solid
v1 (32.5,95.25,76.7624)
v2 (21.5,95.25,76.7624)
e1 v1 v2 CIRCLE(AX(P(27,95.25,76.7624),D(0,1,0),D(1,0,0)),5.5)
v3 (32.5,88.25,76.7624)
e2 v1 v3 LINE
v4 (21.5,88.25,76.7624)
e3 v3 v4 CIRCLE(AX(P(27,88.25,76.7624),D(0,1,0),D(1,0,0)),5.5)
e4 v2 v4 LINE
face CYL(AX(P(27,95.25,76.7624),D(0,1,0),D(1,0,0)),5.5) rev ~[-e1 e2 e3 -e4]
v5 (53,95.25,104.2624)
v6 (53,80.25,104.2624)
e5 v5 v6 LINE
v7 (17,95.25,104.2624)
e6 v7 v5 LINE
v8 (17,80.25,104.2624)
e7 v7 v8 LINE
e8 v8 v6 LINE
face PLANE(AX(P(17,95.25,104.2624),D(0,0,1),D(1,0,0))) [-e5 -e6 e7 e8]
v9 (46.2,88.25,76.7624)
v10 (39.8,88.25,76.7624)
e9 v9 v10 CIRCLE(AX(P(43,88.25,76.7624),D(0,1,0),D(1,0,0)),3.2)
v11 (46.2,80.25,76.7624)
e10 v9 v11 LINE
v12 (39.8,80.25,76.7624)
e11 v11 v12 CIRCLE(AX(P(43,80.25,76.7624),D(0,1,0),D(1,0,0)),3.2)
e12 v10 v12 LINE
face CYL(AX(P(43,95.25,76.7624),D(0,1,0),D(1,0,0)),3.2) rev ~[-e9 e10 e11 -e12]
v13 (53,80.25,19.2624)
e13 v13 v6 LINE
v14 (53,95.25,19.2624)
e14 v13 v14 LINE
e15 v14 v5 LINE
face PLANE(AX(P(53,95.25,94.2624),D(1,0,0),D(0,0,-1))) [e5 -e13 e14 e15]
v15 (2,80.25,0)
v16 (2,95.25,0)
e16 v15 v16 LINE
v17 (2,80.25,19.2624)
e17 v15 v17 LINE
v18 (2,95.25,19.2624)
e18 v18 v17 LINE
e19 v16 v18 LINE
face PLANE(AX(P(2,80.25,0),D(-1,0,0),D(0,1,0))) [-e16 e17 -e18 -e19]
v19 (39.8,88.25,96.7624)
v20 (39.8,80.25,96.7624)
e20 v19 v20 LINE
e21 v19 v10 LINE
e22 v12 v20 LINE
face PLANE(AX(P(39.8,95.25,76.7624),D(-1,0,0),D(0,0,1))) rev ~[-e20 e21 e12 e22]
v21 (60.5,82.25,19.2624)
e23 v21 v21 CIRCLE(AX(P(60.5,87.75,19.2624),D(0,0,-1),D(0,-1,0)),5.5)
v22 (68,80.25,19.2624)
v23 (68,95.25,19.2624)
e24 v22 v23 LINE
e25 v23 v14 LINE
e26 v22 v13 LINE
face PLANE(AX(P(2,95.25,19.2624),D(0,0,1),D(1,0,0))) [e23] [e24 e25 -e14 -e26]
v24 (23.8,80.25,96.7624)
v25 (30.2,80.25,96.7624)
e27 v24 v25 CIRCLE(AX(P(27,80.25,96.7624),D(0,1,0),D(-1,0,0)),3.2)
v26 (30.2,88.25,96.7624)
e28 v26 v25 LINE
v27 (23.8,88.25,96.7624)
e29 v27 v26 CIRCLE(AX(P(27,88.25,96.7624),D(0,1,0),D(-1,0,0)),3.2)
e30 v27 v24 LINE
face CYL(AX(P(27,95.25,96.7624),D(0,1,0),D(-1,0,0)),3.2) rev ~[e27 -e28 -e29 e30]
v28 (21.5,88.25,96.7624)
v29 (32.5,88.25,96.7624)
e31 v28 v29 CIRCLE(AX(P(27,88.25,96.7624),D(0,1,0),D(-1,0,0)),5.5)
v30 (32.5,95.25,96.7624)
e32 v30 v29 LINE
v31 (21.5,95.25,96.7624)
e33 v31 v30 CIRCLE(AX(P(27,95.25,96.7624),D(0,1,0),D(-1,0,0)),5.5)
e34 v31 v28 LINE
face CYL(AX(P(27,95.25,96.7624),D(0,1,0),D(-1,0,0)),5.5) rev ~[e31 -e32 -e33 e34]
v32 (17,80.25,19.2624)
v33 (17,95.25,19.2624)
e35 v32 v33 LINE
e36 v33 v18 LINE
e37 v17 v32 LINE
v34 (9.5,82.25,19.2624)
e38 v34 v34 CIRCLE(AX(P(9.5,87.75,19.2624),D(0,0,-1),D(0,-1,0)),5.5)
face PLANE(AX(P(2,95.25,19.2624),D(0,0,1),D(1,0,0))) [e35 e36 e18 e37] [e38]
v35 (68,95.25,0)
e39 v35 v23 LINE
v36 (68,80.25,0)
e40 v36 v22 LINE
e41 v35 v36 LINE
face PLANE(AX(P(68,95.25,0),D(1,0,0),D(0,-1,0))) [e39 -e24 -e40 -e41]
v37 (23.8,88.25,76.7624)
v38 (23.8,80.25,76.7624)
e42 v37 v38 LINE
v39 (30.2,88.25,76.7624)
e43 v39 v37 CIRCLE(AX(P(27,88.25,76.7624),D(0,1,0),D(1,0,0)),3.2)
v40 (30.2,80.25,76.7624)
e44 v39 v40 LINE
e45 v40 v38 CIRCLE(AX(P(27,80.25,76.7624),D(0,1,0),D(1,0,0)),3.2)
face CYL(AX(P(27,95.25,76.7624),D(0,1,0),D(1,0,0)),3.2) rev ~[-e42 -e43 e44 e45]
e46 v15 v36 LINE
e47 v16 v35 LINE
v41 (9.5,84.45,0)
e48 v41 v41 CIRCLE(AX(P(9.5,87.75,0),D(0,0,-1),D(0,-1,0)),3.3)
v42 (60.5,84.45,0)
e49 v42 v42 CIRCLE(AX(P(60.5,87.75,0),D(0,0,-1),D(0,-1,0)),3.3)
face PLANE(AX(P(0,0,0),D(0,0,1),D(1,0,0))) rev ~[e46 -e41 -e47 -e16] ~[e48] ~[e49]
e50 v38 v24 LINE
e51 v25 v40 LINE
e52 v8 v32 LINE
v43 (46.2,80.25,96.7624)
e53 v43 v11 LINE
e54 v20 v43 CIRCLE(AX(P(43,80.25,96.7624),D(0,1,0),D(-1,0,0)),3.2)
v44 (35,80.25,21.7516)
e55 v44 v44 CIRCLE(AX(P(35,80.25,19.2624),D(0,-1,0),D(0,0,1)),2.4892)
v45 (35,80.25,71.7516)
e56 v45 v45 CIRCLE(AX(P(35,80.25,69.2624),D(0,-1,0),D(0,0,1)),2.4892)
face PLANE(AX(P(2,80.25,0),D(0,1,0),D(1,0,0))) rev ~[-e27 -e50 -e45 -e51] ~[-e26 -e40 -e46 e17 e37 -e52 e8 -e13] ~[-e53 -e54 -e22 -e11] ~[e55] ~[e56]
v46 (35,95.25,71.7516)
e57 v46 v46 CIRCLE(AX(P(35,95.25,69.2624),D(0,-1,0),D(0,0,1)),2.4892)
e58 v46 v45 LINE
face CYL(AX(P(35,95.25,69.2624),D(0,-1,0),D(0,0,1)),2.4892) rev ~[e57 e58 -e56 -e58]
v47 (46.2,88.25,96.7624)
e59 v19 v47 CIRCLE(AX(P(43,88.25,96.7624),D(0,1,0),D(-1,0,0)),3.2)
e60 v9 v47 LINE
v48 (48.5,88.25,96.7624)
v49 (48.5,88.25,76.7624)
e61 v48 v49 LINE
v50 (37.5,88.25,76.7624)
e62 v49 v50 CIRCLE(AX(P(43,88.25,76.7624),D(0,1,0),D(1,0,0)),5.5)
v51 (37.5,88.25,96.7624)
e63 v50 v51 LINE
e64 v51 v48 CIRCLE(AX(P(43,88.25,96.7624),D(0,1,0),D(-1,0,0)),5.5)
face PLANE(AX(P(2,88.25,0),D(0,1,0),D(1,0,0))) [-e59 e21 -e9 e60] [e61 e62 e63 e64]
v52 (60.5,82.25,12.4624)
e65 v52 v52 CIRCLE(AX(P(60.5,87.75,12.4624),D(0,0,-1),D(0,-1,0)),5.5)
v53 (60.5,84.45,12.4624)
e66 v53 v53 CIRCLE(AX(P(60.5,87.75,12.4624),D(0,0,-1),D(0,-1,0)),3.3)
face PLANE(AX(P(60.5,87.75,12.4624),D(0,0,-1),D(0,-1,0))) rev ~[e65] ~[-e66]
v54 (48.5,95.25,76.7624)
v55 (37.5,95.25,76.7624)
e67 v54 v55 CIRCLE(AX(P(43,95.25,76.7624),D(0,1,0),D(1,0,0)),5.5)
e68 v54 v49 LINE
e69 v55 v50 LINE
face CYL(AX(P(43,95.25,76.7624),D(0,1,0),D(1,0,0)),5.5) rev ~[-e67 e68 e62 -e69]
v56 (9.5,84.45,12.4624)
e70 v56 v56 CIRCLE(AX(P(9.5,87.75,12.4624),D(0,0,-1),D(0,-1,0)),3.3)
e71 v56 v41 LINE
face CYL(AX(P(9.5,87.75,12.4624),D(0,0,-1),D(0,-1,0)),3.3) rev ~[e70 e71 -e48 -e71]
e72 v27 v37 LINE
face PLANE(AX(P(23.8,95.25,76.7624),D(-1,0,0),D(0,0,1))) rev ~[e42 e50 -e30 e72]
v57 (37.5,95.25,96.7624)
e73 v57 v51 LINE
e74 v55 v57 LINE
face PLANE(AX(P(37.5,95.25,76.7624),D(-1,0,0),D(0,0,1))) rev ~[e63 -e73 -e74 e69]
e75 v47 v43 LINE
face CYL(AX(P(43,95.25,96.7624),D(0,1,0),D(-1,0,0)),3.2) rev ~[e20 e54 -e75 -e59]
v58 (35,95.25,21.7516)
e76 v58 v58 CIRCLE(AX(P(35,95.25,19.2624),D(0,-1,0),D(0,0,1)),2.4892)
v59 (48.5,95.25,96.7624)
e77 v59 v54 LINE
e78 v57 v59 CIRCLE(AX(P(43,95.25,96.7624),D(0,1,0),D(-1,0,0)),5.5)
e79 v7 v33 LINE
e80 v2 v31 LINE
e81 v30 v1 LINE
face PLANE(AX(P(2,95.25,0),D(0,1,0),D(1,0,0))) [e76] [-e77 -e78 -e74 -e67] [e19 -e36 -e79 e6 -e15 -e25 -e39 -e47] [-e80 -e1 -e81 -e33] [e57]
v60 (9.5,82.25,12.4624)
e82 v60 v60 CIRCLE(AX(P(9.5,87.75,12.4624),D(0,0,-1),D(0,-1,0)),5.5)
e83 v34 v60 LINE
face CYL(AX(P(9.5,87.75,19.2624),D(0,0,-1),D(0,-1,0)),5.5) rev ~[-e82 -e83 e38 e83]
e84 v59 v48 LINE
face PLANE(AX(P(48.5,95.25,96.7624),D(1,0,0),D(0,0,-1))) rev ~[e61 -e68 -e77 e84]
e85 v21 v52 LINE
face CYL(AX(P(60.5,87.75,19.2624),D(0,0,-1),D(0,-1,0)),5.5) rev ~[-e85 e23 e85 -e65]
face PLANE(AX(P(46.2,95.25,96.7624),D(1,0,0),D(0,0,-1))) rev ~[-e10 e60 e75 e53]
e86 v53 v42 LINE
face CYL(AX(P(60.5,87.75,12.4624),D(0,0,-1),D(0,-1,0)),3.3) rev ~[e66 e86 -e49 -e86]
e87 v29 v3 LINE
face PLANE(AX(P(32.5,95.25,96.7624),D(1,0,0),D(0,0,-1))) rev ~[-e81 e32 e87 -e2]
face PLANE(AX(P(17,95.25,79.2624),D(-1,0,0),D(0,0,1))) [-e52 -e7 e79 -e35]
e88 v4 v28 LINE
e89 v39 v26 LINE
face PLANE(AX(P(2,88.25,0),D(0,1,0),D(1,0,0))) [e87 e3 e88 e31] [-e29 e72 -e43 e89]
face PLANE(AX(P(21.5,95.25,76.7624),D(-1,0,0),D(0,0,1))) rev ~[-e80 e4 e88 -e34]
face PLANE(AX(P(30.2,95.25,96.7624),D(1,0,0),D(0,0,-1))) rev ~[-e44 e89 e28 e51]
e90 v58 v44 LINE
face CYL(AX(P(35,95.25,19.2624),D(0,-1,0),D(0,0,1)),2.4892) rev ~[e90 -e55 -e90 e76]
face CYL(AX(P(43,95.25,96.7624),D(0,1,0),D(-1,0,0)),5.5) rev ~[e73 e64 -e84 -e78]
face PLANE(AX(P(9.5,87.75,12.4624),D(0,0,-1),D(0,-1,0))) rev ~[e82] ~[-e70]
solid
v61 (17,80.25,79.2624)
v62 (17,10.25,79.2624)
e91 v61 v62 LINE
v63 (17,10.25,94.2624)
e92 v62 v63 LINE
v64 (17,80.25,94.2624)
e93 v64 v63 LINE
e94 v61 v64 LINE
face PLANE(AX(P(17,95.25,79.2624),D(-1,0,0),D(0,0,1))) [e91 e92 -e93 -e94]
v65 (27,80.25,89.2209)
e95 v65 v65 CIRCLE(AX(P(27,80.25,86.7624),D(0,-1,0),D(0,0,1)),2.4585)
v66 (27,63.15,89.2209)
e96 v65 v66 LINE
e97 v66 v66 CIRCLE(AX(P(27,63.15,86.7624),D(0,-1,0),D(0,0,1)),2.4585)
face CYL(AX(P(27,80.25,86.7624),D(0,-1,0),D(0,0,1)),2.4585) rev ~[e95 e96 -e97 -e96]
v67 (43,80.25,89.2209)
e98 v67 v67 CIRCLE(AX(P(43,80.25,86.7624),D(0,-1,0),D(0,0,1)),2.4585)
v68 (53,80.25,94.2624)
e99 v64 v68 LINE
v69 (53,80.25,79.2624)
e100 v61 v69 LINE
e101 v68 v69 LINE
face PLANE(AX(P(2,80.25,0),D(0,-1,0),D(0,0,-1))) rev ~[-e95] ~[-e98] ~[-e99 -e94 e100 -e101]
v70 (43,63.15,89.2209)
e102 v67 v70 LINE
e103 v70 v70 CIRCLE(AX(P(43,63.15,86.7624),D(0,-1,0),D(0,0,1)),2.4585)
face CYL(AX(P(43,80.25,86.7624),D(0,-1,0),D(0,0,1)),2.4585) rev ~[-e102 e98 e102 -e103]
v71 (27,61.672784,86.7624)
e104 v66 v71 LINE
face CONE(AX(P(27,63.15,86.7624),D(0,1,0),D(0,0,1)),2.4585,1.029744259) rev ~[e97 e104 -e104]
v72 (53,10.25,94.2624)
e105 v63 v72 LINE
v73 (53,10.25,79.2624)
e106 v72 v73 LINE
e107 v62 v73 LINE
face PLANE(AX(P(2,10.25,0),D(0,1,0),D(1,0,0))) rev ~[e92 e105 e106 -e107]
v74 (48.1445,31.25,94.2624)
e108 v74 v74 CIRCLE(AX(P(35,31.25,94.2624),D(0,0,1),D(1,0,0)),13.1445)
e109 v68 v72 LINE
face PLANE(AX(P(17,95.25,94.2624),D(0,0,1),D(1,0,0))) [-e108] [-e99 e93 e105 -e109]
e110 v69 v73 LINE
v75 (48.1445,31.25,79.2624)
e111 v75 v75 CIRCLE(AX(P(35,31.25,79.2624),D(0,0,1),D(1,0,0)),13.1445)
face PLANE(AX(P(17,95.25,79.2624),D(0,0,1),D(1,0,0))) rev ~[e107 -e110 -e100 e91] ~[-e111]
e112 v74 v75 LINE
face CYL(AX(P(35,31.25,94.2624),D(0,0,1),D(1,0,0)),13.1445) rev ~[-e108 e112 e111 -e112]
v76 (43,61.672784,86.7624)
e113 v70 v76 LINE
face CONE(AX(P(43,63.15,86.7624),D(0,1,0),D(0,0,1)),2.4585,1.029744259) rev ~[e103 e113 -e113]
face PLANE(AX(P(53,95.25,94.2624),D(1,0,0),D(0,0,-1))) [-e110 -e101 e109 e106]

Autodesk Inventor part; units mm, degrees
ref_plane "YZ Plane" through (0, 0, 0) normal (1, 0, 0) x (0, 1, 0)
ref_plane "XZ Plane" through (0, 0, 0) normal (0, 1, 0) x (-1, 0, 0)
ref_plane "Work Plane1" through (0, 0, 0) normal (0, 0, 1) x (1, 0, 0)
sketch "Sketch1" plane through (0, 0, 0) normal (0, 0, 1) x (1, 0, 0)
  line L0 (2, 95.25) -> (68, 95.25)
  line L1 (2, 80.25) -> (68, 80.25)
  line L2 (2, 0) -> (2, 95.25)
  line L3 (68, 95.25) -> (68, 0)
  point P0 (0, 0)
ref_plane "Work Plane2" through (12.0686, 8.3392, 79.2624) normal (0, 0, 1) x (1, 0, 0)
extrude "Extrusion1" add sketch "Sketch1" along normal up to surface (79.2624 mm away)
sketch "Sketch2" plane through (2, 95.25, 79.2624) normal (0, 0, 1) x (1, 0, 0)
  line L0 (66, -15) -> (66, 0) projected
  line L1 (66, 0) -> (0, 0) projected
  line L2 (66, -15) -> (51, -15)
  line L3 (51, -15) -> (51, 0)
  line L4 (51, 0) -> (66, 0)
  line L5 (66, 0) -> (66, -15)
  line L6 (0, 0) -> (0, -15) projected
  line L7 (0, -15) -> (15, -15)
  line L8 (15, -15) -> (15, 0)
  line L9 (15, 0) -> (0, 0)
  line L10 (0, 0) -> (0, -15)
  point P0 (-2, -95.25)
  dimension "d2" = 15
  dimension "d3" = 15
extrude "Extrusion2" cut sketch "Sketch2" against normal blind 60
sketch "Sketch4" plane through (2, 95.25, 19.2624) normal (0, 0, 1) x (1, 0, 0)
  line L0 (66, -15) -> (51, -15) projected
  line L1 (66, 0) -> (66, -15) projected
  line L2 (51, 0) -> (66, 0) projected
  line L3 (51, -15) -> (51, 0) projected
  line L4 (15, -15) -> (0, -15) projected
  line L5 (0, -15) -> (0, 0) projected
  line L6 (15, 0) -> (15, -15) projected
  line L7 (0, 0) -> (15, 0) projected
  point P0 (-2, -95.25)
  point P1 (58.5, -7.5)
  point P2 (7.5, -7.5)
hole "Hole1" at (60.5, 87.75, 19.2624) at (9.5, 87.75, 19.2624) direction (0, 0, -1) diameter 6.6 end through all counterbore diameter 11 counterbore depth 6.8 clearance for "Socket Head Cap Screw ISO 4762" size "M6" standard "ISO"
sketch "Sketch5" plane through (2, 95.25, 0) normal (0, 1, 0) x (1, 0, 0)
  line L0 (51, -79.2624) -> (51, -19.2624) projected
  line L1 (15, -19.2624) -> (15, -79.2624) projected
  line L2 (15, -79.2624) -> (51, -79.2624) projected
  line L3 (51, -79.2624) -> (15, -79.2624)
  line L4 (15, -79.2624) -> (15, -94.2624)
  line L5 (15, -94.2624) -> (51, -94.2624)
  line L6 (51, -94.2624) -> (51, -79.2624)
  point P0 (-2, 0)
  dimension "d13" = 15
extrude "Extrusion3" add sketch "Sketch5" against normal blind 85
sketch "Sketch6" plane through (17, 95.25, 94.2624) normal (0, 0, 1) x (1, 0, 0)
  circle A0 centre (18, -64) radius 25
  circle A1 centre (18, -64) radius 13.1445
  point P0 (-17, -95.25)
  dimension "d16" = 26.289
extrude "Extrusion4" cut sketch "Sketch6" against normal up to surface (15 mm away) contours A1
sketch "Sketch7" plane through (2, 95.25, 0) normal (0, 1, 0) x (1, 0, 0)
  line L0 (66, 0) -> (0, 0) projected
  line L1 (51, -94.2624) -> (51, -19.2624) projected
  line L2 (15, -19.2624) -> (15, -94.2624) projected
  line L3 (15, -94.2624) -> (51, -94.2624) projected
  line L4 (51, -94.2624) -> (51, -19.2624) projected
  line L5 (51, -19.2624) -> (66, -19.2624) projected
  line L6 (66, 0) -> (66, -19.2624) projected
  line L7 (66, 0) -> (0, 0) projected
  line L8 (0, 0) -> (0, -19.2624) projected
  line L9 (0, -19.2624) -> (15, -19.2624) projected
  point P0 (-2, 0)
  point P1 (33, -19.2624)
  point P2 (33, -69.2624)
  dimension "d19" = 50
hole "Hole2" at (35, 95.25, 19.2624) at (35, 95.25, 69.2624) direction (0, -1, 0) diameter 4.9784 depth 19.05 tip angle 118 thread size "1/4-20 UNC" class "2B" standard "ANSI Unified Screw Threads"
ref_plane "Work Plane3" through (2, 80.25, 0) normal (0, -1, 0) x (1, 0, 0)
split body "Split1" result two bodies by plane through (2, 80.25, 0) normal (0, -1, 0) first body at (35.5281, 68.2662, 93.7624)
sketch "Sketch8" plane through (17, 95.25, 94.2624) normal (0, 0, 1) x (1, 0, 0)
  line L0 (0, -15) -> (36, -15) projected
  line L1 (36, 0) -> (36, -15) projected
  line L2 (0, 0) -> (36, 0) projected
  line L3 (0, 0) -> (0, -15) projected
  point P0 (-17, -95.25)
extrude "Extrusion5" add sketch "Sketch8" along normal blind 10 bodies 3
sketch "Sketch10" plane through (17, 80.25, 94.2624) normal (0, 1, 0) x (1, 0, 0)
  line L0 (0, 0) -> (36, 0) projected
  line L1 (36, 0) -> (36, 15) projected
  line L2 (36, 15) -> (0, 15) projected
  line L3 (0, 15) -> (0, 0) projected
  point P0 (-17, 94.2624)
  point P1 (10, 7.5)
  point P2 (26, 7.5)
  point P3 (36, 7.5)
  dimension "d30" = 10
  dimension "d31" = 10
hole "Hole3" at (27, 80.25, 86.7624) at (43, 80.25, 86.7624) direction (0, -1, 0) diameter 4.917 depth 17.1 tip angle 118 bodies 2 thread size "M6x1" class "6H" standard "ISO Metric profile"
sketch "Sketch11" plane through (2, 95.25, 0) normal (0, 1, 0) x (1, 0, 0)
  circle A0 centre (41, -86.7624) radius 2.4585 projected
  circle A1 centre (25, -86.7624) radius 2.4585 projected
  line L0 (41, -96.7624) -> (41, -76.7624) construction
  line L1 (46.5, -96.7624) -> (46.5, -76.7624)
  line L2 (35.5, -76.7624) -> (35.5, -96.7624)
  arc A2 (35.5, -96.7624) -> (46.5, -96.7624) centre (41, -96.7624) ccw
  arc A3 (46.5, -76.7624) -> (35.5, -76.7624) centre (41, -76.7624) ccw
  line L3 (25, -96.7624) -> (25, -76.7624) construction
  line L4 (30.5, -96.7624) -> (30.5, -76.7624)
  line L5 (19.5, -76.7624) -> (19.5, -96.7624)
  arc A4 (19.5, -96.7624) -> (30.5, -96.7624) centre (25, -96.7624) ccw
  arc A5 (30.5, -76.7624) -> (19.5, -76.7624) centre (25, -76.7624) ccw
  line L6 (41, -96.7624) -> (41, -76.7624) construction
  line L7 (44.2, -96.7624) -> (44.2, -76.7624)
  line L8 (37.8, -76.7624) -> (37.8, -96.7624)
  arc A6 (37.8, -96.7624) -> (44.2, -96.7624) centre (41, -96.7624) ccw
  arc A7 (44.2, -76.7624) -> (37.8, -76.7624) centre (41, -76.7624) ccw
  line L9 (25, -96.7624) -> (25, -76.7624) construction
  line L10 (28.2, -96.7624) -> (28.2, -76.7624)
  line L11 (21.8, -76.7624) -> (21.8, -96.7624)
  arc A8 (21.8, -96.7624) -> (28.2, -96.7624) centre (25, -96.7624) ccw
  arc A9 (28.2, -76.7624) -> (21.8, -76.7624) centre (25, -76.7624) ccw
  point P0 (-2, 0)
  dimension "d39" = 10
  dimension "d40" = 11
  dimension "d41" = 10
  dimension "d42" = 11
  dimension "d43" = 6.4
  dimension "d44" = 6.4
extrude "Extrusion6" cut sketch "Sketch11" against normal up to surface (15 mm away) contours A0 | A1 | A6 L8 A7 L7 | A8 L11 A9 L10 bodies 3
extrude "Extrusion7" cut sketch "Sketch11" against normal blind 7 contours A0 | A1 | A2 L2 A3 L1 | A4 L5 A5 L4 | A6 L8 A7 L7 | A8 L11 A9 L10 bodies 3
properties part number "AdapterBracket"
